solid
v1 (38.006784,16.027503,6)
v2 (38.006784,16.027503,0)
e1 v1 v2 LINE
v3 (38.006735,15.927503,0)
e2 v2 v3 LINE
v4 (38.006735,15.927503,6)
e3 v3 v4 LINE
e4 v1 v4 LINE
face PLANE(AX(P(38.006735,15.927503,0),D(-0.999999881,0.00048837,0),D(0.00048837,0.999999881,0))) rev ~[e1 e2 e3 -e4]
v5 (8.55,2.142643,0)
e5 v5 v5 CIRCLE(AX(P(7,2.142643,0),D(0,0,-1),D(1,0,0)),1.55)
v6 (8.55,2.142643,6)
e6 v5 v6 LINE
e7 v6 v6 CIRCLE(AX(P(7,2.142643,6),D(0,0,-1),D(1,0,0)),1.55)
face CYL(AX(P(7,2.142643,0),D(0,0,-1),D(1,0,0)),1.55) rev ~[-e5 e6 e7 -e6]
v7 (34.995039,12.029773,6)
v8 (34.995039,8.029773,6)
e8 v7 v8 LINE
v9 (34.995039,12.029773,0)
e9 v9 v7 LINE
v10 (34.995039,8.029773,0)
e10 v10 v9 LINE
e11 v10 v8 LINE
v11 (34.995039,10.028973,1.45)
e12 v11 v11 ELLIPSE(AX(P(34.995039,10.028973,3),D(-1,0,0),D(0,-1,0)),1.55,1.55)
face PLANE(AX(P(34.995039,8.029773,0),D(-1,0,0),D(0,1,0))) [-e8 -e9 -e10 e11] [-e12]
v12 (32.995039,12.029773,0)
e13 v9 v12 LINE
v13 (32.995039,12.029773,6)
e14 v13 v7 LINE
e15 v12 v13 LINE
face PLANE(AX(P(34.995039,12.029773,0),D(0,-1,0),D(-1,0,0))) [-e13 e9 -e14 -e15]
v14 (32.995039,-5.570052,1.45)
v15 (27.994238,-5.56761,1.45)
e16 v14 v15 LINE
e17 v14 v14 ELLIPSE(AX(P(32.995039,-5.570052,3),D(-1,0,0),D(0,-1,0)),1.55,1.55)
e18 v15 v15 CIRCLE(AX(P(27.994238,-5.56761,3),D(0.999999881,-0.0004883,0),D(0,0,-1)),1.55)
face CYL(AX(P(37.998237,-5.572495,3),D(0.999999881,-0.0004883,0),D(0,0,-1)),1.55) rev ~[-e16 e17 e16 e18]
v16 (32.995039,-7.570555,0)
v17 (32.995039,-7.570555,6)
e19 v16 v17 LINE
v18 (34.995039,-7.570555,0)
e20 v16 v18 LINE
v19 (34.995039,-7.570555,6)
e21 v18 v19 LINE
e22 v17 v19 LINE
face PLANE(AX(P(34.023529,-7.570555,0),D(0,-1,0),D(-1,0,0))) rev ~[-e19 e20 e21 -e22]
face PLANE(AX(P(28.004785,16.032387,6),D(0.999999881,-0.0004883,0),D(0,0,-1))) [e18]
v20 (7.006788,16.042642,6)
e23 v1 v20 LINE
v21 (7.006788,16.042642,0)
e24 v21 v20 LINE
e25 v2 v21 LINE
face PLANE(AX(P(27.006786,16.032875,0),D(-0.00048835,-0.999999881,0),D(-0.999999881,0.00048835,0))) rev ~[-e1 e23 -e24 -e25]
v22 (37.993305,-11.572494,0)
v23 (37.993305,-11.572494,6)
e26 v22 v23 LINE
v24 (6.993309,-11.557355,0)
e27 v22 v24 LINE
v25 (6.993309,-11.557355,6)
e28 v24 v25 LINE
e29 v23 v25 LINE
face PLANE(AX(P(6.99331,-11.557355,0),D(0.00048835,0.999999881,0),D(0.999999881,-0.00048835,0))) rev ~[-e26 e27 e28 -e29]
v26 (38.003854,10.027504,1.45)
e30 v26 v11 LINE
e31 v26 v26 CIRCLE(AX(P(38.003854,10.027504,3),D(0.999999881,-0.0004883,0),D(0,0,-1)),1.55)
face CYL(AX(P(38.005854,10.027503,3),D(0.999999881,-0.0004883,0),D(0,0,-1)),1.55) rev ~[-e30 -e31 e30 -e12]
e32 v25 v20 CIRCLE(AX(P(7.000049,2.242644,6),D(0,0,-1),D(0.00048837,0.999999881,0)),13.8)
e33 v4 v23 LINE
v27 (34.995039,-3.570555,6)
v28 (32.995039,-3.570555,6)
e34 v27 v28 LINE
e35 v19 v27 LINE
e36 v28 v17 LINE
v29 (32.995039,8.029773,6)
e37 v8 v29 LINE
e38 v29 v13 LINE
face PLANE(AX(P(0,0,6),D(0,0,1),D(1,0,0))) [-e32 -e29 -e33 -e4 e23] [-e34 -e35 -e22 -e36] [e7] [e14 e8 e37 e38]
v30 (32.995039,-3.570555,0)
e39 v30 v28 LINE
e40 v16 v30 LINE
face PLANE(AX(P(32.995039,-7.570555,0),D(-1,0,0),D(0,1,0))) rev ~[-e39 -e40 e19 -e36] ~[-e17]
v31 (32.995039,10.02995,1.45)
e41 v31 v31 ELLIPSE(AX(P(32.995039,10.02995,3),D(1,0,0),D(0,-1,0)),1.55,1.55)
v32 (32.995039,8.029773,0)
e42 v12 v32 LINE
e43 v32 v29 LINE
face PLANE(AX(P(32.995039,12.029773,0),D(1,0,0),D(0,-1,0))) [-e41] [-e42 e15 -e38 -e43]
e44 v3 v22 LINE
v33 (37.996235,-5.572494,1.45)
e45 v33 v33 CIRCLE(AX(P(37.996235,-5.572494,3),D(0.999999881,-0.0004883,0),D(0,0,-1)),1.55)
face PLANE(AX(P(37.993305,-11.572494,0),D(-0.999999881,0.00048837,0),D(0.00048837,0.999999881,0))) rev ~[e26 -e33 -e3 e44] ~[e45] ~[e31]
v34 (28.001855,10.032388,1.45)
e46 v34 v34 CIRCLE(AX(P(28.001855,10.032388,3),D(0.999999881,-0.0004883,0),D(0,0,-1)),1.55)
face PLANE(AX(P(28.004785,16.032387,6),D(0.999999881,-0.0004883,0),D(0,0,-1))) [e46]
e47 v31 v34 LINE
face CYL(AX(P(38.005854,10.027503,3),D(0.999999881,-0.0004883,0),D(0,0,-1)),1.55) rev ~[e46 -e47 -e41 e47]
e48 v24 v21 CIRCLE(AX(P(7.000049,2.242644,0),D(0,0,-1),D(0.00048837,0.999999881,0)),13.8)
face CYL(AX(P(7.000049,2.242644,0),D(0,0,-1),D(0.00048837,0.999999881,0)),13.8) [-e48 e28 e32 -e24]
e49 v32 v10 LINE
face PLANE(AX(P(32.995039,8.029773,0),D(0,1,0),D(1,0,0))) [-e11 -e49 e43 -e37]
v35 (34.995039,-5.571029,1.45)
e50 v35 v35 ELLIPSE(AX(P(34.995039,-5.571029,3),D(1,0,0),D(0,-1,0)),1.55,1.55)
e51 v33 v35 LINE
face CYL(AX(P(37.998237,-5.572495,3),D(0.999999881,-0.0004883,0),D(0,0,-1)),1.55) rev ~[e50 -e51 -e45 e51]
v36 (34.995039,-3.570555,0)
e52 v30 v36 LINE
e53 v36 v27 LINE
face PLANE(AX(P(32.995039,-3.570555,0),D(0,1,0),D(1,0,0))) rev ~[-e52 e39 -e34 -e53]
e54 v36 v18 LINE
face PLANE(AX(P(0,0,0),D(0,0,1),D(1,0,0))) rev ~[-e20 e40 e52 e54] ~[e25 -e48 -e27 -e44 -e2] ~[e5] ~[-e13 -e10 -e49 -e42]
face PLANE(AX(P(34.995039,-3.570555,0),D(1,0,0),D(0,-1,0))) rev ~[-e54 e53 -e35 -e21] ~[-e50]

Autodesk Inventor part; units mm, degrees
ref_plane "YZ Plane" through (0, 0, 0) normal (1, 0, 0) x (0, 1, 0)
ref_plane "XZ Plane" through (0, 0, 0) normal (0, 1, 0) x (-1, 0, 0)
ref_plane "XY Plane" through (0, 0, 0) normal (0, 0, 1) x (1, 0, 0)
ref_plane "작업 평면1" through (0, 0, 0) normal (0, 0, 1) x (1, 0, 0)
sketch "스케치1" plane through (0, 0, 0) normal (0, 0, 1) x (1, 0, 0)
  line L0 (6.993261, -11.657355) -> (26.993258, -11.667122)
  arc A0 (7.006739, 15.942642) -> (6.993261, -11.657355) centre (7, 2.142643) ccw
  line L1 (27.006737, 15.932875) -> (7.006739, 15.942642)
  line L2 (26.993258, -11.667122) -> (27.006737, 15.932875)
  circle A1 centre (-0.776779, -5.636927) radius 1.65
  circle A2 centre (-4, 2.140669) radius 1.65
  circle A3 centre (-0.77957, 9.919422) radius 1.65
  circle A4 centre (6.998026, 13.142643) radius 1.65
  circle A5 centre (14.776779, 9.922214) radius 1.65
  circle A6 centre (18, 2.144617) radius 1.65
  circle A7 centre (14.77957, -5.634135) radius 1.65
  circle A8 centre (7.001974, -8.857357) radius 1.65
  circle A9 centre (7, 2.142643) radius 5.1
  circle A10 centre (7, 2.142643) radius 3.55
  line L3 (6.99331, -11.557355) -> (26.993307, -11.567122)
  line L4 (26.993307, -11.567122) -> (27.006786, 16.032875)
  line L5 (27.006786, 16.032875) -> (7.006788, 16.042642)
  arc A11 (7.006788, 16.042642) -> (6.99331, -11.557355) centre (7.000049, 2.242643) ccw
  circle A12 centre (-0.781923, -5.531732) radius 1.65
  circle A13 centre (-3.99995, 2.248015) radius 1.65
  circle A14 centre (-0.774326, 10.024615) radius 1.65
  circle A15 centre (7.005421, 13.242642) radius 1.65
  circle A16 centre (14.782021, 10.017018) radius 1.65
  circle A17 centre (18.000048, 2.237271) radius 1.65
  circle A18 centre (14.774424, -5.539329) radius 1.65
  circle A19 centre (6.994677, -8.757356) radius 1.65
  circle A20 centre (7.000049, 2.242643) radius 5.1
  point P0 (0, 0)
  dimension "d0" = 7.1
extrude "돌출1" add sketch "스케치1" along normal blind 6 contours A11 L5 L4 L1 A0 | A0 L1 L2 L3 A11 | A1 A12 | A12 A1 | A1 A12 | A2 A13 | A13 A2 | A2 A13 | A14 A3 | A3 A14 | A3 A14 | A4 A15 | A4 A15 | A15 A4 | A5 A16 | A5 A16 | A16 A5 | A6 | A7 A18 | A18 A7 | A7 A18 | A8 A19 | A19 A8 | A8 A19 | A20 A9 | A9 A20 | A9 A20 | A17
offset faces "크기1" outward 2 faces at (10.504028, 1.573183, 4)
move faces "이동1" translate (4.999999, -0.002442, 0) faces at (27.00226, 6.766209, 4)
move faces "이동2" translate (1, -0.000488, 0) faces at (32.006753, 15.963766, 2) (32.00226, 6.763767, 4)
move faces "이동3" translate (4.999999, -0.002442, 0) faces at (33.006752, 15.963278, 2) (32.997783, -2.403387, 4)
sketch "스케치3" plane through (38.006784, 16.027503, 6) normal (0.9999999, -0.0004883, 0) x (0, 0, -1)
  circle A0 centre (3, -6) radius 1.55
  circle A1 centre (57.100995, -6.1) radius 1.55
  circle A2 centre (3, -21.6) radius 1.55
  circle A3 centre (57.100995, -21.7) radius 1.55
  line L0 (-17.781018, 8.082697) -> (114.718982, 8.082697)
  line L1 (-17.781018, -71.417303) -> (-17.781018, 8.082697)
  line L2 (114.718982, -71.417303) -> (-17.781018, -71.417303)
  line L3 (114.718982, 8.082697) -> (114.718982, -71.417303)
  point P0 (6, -16.046061)
extrude "돌출3" cut sketch "스케치3" against normal blind 10 contours A0 | A2
sketch "스케치4" plane through (0, 0, 0) normal (0, 0, -1) x (-1, 0, 0)
  line L0 (-38.006784, 16.027503) -> (-7.006788, 16.042642)
  line L1 (-33.358652, 16.029773) -> (-33.358652, 12.029773)
  line L2 (-33.358652, 16.029773) -> (-29.358652, 16.029773) construction
  line L3 (-6.99331, -11.557355) -> (-37.993306, -11.572494)
  line L4 (-34.023529, -11.570555) -> (-34.023529, -7.570555)
  line L5 (-34.023529, -11.570555) -> (-30.023529, -11.570555) construction
  line L6 (-37.993306, -11.572494) -> (-38.006784, 16.027503)
  line L7 (-37.995039, -8.023851) -> (-34.995039, -8.023851)
  line L8 (-37.995039, -8.023851) -> (-34.995039, -8.023851) construction
  line L9 (-34.995039, -7.570555) -> (-32.995039, -7.570555)
  line L10 (-32.995039, -7.570555) -> (-32.995039, -3.570555)
  line L11 (-32.995039, -3.570555) -> (-34.995039, -3.570555)
  line L12 (-34.995039, -3.570555) -> (-34.995039, -7.570555)
  line L13 (-34.995039, 12.029773) -> (-32.995039, 12.029773)
  line L14 (-32.995039, 12.029773) -> (-32.995039, 8.029773)
  line L15 (-32.995039, 8.029773) -> (-34.995039, 8.029773)
  line L16 (-34.995039, 8.029773) -> (-34.995039, 12.029773)
  point P0 (0, 0)
  dimension "d17" = 4
  dimension "d18" = 90
  dimension "d19" = 4
  dimension "d20" = 90
  dimension "d21" = 3
  dimension "d22" = 0
  dimension "d23" = 2
  dimension "d24" = 4
  dimension "d25" = 2
  dimension "d26" = 4
extrude "돌출4" cut sketch "스케치4" against normal blind 10
properties part number "6" material "아크릴, 선명"
